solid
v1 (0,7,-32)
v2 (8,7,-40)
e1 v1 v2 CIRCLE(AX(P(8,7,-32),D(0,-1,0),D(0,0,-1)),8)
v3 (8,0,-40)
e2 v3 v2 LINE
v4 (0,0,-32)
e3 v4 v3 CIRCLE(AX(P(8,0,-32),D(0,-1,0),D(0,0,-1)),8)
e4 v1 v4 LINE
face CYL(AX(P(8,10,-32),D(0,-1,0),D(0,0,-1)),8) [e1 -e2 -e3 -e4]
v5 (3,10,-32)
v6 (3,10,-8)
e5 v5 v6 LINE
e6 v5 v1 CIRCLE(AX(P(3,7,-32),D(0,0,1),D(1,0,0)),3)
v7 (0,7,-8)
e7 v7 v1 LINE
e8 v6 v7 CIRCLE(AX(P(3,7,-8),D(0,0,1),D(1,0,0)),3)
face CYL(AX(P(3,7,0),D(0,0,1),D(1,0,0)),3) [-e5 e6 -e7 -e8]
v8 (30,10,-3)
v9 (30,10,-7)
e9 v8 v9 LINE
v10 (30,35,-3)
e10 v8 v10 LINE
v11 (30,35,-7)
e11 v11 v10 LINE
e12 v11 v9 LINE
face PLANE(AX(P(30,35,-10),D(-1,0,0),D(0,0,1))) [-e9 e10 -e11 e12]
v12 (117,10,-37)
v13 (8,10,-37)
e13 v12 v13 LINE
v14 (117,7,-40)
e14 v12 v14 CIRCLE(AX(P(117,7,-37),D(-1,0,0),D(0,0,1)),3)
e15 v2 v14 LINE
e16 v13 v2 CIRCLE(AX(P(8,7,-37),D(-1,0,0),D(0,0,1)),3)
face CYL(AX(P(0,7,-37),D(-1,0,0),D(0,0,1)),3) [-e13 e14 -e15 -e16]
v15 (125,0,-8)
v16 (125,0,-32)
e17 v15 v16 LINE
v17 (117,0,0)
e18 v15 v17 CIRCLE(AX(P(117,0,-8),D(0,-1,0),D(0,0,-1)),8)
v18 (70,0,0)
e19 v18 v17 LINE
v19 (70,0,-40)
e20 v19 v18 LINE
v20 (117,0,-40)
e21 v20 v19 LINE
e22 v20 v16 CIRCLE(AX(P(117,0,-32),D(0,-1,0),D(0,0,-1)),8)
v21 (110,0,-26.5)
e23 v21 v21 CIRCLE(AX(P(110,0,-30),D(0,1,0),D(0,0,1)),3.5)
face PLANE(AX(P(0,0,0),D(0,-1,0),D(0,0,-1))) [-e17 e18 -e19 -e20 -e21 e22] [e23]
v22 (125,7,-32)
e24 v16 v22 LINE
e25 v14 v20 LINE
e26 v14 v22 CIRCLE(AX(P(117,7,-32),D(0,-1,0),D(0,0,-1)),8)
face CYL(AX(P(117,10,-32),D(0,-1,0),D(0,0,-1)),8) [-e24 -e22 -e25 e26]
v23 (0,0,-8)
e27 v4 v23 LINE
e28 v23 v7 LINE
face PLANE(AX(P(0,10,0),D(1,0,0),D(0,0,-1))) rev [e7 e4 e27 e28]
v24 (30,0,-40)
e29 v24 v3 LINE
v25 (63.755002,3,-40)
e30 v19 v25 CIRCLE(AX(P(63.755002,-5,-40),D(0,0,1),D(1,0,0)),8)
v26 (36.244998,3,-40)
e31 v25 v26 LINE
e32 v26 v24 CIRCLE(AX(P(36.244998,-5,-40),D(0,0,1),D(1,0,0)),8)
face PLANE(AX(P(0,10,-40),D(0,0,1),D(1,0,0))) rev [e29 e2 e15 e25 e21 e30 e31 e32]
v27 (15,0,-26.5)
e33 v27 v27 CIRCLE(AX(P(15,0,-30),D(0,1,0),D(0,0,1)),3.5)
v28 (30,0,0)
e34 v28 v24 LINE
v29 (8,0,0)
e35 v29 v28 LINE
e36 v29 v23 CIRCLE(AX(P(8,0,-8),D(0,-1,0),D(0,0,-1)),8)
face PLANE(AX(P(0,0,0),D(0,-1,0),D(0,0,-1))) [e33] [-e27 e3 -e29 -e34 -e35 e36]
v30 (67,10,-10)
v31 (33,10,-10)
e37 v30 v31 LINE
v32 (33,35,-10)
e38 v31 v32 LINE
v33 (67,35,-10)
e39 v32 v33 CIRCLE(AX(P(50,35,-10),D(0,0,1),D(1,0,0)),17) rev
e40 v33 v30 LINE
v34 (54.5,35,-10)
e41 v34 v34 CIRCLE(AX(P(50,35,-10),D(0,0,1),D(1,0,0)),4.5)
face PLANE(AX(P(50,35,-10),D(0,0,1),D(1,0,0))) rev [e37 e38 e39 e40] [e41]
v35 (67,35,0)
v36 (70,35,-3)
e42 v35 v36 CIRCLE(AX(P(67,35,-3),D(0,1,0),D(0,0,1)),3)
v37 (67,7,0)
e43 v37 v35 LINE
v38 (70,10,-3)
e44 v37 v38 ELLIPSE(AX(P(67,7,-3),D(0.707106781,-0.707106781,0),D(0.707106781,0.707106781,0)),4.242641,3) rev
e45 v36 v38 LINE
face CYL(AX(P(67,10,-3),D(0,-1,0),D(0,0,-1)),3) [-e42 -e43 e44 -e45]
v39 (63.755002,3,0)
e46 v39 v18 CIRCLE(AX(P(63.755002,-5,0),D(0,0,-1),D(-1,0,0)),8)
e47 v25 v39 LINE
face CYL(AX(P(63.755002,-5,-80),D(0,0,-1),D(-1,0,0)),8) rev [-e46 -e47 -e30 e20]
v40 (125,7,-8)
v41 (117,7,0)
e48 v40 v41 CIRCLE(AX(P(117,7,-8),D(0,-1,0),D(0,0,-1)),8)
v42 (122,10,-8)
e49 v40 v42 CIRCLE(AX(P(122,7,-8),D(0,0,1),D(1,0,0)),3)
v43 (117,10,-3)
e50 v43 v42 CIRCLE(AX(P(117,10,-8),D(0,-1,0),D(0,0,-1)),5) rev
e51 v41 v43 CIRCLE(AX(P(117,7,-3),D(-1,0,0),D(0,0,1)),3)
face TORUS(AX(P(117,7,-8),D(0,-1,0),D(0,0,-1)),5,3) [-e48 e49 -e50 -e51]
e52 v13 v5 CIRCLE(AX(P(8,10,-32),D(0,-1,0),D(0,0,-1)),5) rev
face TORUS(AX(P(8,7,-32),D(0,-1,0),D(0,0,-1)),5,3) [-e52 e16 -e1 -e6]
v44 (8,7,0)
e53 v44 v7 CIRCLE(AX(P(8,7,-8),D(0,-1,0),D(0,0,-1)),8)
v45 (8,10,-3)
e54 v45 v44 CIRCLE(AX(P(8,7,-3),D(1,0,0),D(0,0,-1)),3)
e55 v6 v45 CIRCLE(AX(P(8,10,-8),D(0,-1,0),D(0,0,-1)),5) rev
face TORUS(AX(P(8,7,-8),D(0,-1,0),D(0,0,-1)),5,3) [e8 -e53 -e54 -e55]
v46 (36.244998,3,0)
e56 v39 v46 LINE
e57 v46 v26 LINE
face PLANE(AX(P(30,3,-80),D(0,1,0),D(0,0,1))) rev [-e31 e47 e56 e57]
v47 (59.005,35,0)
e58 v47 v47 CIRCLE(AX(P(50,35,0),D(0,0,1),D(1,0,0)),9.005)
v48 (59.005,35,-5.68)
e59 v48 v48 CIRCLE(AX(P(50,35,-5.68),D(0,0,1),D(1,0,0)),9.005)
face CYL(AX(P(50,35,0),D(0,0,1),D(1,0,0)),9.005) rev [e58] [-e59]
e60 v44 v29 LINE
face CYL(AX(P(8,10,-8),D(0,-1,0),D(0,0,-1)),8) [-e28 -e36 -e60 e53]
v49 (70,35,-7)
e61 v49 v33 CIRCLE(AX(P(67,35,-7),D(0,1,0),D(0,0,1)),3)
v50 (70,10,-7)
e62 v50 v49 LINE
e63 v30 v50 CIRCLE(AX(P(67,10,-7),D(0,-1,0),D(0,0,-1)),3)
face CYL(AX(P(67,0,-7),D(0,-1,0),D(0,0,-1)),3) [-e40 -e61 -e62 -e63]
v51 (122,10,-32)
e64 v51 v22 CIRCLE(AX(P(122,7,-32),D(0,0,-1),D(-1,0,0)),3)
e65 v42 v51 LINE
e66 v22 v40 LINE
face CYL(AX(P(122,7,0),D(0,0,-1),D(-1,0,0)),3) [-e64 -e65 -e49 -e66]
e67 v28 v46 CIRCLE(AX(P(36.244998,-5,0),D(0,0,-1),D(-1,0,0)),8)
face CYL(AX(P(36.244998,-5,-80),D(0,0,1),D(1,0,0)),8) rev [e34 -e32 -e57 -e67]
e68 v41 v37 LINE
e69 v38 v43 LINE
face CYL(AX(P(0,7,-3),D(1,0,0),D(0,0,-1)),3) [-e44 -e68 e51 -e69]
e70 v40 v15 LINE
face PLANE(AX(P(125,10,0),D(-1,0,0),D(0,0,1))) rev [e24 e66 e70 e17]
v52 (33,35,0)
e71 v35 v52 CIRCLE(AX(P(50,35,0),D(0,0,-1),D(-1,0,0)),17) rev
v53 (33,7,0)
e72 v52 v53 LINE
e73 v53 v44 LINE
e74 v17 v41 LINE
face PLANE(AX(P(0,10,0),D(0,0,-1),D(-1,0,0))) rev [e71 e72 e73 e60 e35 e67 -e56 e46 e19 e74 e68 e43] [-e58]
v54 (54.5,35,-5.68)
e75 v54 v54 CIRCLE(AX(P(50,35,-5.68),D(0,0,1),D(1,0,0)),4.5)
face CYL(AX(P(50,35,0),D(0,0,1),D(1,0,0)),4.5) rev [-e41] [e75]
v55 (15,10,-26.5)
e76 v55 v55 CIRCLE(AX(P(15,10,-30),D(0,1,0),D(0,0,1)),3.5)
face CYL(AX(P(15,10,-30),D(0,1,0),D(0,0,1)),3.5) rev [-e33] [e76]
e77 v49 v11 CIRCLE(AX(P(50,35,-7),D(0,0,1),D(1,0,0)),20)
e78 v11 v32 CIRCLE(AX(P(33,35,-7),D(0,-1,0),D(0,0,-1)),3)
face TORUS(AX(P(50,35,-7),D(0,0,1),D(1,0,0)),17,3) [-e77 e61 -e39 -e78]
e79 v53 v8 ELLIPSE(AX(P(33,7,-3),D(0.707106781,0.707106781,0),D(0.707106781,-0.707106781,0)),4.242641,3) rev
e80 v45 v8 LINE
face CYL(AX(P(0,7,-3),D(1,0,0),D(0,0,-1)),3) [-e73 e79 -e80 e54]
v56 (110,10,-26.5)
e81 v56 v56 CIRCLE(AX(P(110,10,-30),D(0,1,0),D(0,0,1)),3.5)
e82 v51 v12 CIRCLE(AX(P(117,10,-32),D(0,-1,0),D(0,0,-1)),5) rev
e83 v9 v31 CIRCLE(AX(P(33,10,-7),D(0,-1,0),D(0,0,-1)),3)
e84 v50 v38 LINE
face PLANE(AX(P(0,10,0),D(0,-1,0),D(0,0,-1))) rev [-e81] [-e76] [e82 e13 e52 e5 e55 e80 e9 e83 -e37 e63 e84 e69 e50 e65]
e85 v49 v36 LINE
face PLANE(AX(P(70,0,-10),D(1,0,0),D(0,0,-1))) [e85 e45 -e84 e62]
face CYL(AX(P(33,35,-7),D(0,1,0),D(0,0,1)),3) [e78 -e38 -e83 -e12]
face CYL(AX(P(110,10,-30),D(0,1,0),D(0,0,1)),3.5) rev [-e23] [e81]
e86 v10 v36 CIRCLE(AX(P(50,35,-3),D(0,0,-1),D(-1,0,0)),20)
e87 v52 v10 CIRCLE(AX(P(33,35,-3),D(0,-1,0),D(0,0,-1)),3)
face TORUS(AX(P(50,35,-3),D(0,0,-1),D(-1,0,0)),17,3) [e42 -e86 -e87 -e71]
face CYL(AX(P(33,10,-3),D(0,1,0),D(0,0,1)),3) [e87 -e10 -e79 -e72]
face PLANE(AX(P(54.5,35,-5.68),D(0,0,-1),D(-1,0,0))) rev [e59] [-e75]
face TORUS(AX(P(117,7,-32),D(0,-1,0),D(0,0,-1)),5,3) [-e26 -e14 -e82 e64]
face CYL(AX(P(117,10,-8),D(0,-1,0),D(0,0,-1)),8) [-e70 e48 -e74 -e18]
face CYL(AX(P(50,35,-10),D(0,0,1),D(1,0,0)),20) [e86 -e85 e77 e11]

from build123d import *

# Parameters (mm, degrees)
SKETCH2_W                               = 125
SKETCH2_H                               = 40
BOSS_EXTRUDE1_DEPTH                     = 10
BOSS_EXTRUDE2_DEPTH                     = 10
SKETCH4_W                               = 40
SKETCH4_H                               = 3
CUT_EXTRUDE1_DEPTH                      = 80
CBORE_FOR_M8_HEX_HEAD_BOLT1_D           = 9
CBORE_FOR_M8_HEX_HEAD_BOLT1_CBORE_D     = 18.01
CBORE_FOR_M8_HEX_HEAD_BOLT1_CBORE_DEPTH = 5.68
FILLET2_R                               = 8
FILLET3_R                               = 3
F_7_0_7_DIAMETER_HOLE1_D                = 7


with BuildPart() as part:
    # Sketch2 → Boss-Extrude1 (new body)
    with BuildSketch(Plane(origin=(0, 0, 0), x_dir=(1, 0, 0), z_dir=(0, 1, 0))):
        with Locations((62.5, 20)):
            Rectangle(SKETCH2_W, SKETCH2_H)
    extrude(amount=BOSS_EXTRUDE1_DEPTH)

    # Sketch3 → Boss-Extrude2 (add)
    with BuildSketch(Plane.XY):
        with BuildLine():
            Line((30, 35), (30, 0))
            Line((30, 0), (70, 0))
            Line((70, 0), (70, 35))
            ThreePointArc((70, 35), (50, 55), (30, 35))
        make_face()
    extrude(amount=-BOSS_EXTRUDE2_DEPTH)

    # Sketch4 → Cut-Extrude1 (cut)
    with BuildSketch(Plane.XY):
        with Locations((50, 1.5)):
            Rectangle(SKETCH4_W, SKETCH4_H)
    extrude(amount=-CUT_EXTRUDE1_DEPTH, mode=Mode.SUBTRACT)

    # CBORE for M8 Hex Head Bolt1 (through all)
    with Locations(Plane(origin=(50, 35, 0), x_dir=(1, 0, 0), z_dir=(0, 0, 1))):
        with Locations((0, 0)):
            CounterBoreHole(CBORE_FOR_M8_HEX_HEAD_BOLT1_D / 2, CBORE_FOR_M8_HEX_HEAD_BOLT1_CBORE_D / 2, CBORE_FOR_M8_HEX_HEAD_BOLT1_CBORE_DEPTH)

    # Fillet2
    # the kernel refuses this fillet: 8 mm, written as the material it adds along each edge
    with BuildSketch(Plane(origin=(70, 3, 0), x_dir=(-1, 0, 0), z_dir=(0, 0, -1))) as fillet2_piece_1:
        with BuildLine():
            CenterArc((6.244997998, -8), FILLET2_R, 90, 51.317812547)
            Line((0, -3), (0, 0))
            Line((0, 0), (6.244997998, 0))
        make_face()
    extrude(amount=40)
    with BuildSketch(Plane(origin=(30, 3, 0), x_dir=(0, -1, 0), z_dir=(0, 0, -1))) as fillet2_piece_2:
        with BuildLine():
            CenterArc((8, -6.244997998), FILLET2_R, 128.682187453, 51.317812547)
            Line((0, -6.244997998), (0, 0))
            Line((0, 0), (3, 0))
        make_face()
    extrude(amount=40)
    # the kernel refuses this fillet: 8 mm, written as the material it takes off along each edge
    with BuildSketch(Plane(origin=(125, -20, 0), x_dir=(-1, 0, 0), z_dir=(0, 1, 0)), Plane(origin=(125, -20, -40), x_dir=(0, 0, 1), z_dir=(0, 1, 0))) as fillet2_2_piece_1:
        with BuildLine():
            CenterArc((FILLET2_R, -FILLET2_R), FILLET2_R, 90, 90)
            Line((0, -FILLET2_R), (0, 0))
            Line((0, 0), (FILLET2_R, 0))
        make_face()
    extrude(amount=50, mode=Mode.SUBTRACT)
    with BuildSketch(Plane(origin=(0, -20, -40), x_dir=(0, 0, 1), z_dir=(0, 1, 0)), Plane(origin=(0, -20, 0), x_dir=(1, 0, 0), z_dir=(0, 1, 0))) as fillet2_2_piece_2:
        with BuildLine():
            CenterArc((FILLET2_R, FILLET2_R), FILLET2_R, 180, 90)
            Line((0, FILLET2_R), (0, 0))
            Line((0, 0), (FILLET2_R, 0))
        make_face()
    extrude(amount=50, mode=Mode.SUBTRACT)

    # Fillet3
    fillet3_edges = [part.edges().sort_by_distance(p)[0] for p in [
        (93.5, 10, 0),
        (70, 22.5, -10),
        (30, 22.5, -10),
        (70, 22.5, 0),
        (50, 55, 0),
        (30, 22.5, 0),
        (50, 55, -10),
        (125, 10, -20),
        (19, 10, 0),
        (62.5, 10, -40),
        (0, 10, -20),
        (2.343145751, 10, -2.343145751),
        (2.343145751, 10, -37.656854249),
        (122.656854249, 10, -37.656854249),
        (122.656854249, 10, -2.343145751),
    ]]
    fillet(fillet3_edges, radius=FILLET3_R)

    # Ø7.0 (7) Diameter Hole1 (through all)
    with Locations(Plane(origin=(15, 10, -30), x_dir=(0, 0, 1), z_dir=(0, 1, 0))):
        with Locations((0, 0), (0, 95)):
            Hole(F_7_0_7_DIAMETER_HOLE1_D / 2)


solid = part.part
